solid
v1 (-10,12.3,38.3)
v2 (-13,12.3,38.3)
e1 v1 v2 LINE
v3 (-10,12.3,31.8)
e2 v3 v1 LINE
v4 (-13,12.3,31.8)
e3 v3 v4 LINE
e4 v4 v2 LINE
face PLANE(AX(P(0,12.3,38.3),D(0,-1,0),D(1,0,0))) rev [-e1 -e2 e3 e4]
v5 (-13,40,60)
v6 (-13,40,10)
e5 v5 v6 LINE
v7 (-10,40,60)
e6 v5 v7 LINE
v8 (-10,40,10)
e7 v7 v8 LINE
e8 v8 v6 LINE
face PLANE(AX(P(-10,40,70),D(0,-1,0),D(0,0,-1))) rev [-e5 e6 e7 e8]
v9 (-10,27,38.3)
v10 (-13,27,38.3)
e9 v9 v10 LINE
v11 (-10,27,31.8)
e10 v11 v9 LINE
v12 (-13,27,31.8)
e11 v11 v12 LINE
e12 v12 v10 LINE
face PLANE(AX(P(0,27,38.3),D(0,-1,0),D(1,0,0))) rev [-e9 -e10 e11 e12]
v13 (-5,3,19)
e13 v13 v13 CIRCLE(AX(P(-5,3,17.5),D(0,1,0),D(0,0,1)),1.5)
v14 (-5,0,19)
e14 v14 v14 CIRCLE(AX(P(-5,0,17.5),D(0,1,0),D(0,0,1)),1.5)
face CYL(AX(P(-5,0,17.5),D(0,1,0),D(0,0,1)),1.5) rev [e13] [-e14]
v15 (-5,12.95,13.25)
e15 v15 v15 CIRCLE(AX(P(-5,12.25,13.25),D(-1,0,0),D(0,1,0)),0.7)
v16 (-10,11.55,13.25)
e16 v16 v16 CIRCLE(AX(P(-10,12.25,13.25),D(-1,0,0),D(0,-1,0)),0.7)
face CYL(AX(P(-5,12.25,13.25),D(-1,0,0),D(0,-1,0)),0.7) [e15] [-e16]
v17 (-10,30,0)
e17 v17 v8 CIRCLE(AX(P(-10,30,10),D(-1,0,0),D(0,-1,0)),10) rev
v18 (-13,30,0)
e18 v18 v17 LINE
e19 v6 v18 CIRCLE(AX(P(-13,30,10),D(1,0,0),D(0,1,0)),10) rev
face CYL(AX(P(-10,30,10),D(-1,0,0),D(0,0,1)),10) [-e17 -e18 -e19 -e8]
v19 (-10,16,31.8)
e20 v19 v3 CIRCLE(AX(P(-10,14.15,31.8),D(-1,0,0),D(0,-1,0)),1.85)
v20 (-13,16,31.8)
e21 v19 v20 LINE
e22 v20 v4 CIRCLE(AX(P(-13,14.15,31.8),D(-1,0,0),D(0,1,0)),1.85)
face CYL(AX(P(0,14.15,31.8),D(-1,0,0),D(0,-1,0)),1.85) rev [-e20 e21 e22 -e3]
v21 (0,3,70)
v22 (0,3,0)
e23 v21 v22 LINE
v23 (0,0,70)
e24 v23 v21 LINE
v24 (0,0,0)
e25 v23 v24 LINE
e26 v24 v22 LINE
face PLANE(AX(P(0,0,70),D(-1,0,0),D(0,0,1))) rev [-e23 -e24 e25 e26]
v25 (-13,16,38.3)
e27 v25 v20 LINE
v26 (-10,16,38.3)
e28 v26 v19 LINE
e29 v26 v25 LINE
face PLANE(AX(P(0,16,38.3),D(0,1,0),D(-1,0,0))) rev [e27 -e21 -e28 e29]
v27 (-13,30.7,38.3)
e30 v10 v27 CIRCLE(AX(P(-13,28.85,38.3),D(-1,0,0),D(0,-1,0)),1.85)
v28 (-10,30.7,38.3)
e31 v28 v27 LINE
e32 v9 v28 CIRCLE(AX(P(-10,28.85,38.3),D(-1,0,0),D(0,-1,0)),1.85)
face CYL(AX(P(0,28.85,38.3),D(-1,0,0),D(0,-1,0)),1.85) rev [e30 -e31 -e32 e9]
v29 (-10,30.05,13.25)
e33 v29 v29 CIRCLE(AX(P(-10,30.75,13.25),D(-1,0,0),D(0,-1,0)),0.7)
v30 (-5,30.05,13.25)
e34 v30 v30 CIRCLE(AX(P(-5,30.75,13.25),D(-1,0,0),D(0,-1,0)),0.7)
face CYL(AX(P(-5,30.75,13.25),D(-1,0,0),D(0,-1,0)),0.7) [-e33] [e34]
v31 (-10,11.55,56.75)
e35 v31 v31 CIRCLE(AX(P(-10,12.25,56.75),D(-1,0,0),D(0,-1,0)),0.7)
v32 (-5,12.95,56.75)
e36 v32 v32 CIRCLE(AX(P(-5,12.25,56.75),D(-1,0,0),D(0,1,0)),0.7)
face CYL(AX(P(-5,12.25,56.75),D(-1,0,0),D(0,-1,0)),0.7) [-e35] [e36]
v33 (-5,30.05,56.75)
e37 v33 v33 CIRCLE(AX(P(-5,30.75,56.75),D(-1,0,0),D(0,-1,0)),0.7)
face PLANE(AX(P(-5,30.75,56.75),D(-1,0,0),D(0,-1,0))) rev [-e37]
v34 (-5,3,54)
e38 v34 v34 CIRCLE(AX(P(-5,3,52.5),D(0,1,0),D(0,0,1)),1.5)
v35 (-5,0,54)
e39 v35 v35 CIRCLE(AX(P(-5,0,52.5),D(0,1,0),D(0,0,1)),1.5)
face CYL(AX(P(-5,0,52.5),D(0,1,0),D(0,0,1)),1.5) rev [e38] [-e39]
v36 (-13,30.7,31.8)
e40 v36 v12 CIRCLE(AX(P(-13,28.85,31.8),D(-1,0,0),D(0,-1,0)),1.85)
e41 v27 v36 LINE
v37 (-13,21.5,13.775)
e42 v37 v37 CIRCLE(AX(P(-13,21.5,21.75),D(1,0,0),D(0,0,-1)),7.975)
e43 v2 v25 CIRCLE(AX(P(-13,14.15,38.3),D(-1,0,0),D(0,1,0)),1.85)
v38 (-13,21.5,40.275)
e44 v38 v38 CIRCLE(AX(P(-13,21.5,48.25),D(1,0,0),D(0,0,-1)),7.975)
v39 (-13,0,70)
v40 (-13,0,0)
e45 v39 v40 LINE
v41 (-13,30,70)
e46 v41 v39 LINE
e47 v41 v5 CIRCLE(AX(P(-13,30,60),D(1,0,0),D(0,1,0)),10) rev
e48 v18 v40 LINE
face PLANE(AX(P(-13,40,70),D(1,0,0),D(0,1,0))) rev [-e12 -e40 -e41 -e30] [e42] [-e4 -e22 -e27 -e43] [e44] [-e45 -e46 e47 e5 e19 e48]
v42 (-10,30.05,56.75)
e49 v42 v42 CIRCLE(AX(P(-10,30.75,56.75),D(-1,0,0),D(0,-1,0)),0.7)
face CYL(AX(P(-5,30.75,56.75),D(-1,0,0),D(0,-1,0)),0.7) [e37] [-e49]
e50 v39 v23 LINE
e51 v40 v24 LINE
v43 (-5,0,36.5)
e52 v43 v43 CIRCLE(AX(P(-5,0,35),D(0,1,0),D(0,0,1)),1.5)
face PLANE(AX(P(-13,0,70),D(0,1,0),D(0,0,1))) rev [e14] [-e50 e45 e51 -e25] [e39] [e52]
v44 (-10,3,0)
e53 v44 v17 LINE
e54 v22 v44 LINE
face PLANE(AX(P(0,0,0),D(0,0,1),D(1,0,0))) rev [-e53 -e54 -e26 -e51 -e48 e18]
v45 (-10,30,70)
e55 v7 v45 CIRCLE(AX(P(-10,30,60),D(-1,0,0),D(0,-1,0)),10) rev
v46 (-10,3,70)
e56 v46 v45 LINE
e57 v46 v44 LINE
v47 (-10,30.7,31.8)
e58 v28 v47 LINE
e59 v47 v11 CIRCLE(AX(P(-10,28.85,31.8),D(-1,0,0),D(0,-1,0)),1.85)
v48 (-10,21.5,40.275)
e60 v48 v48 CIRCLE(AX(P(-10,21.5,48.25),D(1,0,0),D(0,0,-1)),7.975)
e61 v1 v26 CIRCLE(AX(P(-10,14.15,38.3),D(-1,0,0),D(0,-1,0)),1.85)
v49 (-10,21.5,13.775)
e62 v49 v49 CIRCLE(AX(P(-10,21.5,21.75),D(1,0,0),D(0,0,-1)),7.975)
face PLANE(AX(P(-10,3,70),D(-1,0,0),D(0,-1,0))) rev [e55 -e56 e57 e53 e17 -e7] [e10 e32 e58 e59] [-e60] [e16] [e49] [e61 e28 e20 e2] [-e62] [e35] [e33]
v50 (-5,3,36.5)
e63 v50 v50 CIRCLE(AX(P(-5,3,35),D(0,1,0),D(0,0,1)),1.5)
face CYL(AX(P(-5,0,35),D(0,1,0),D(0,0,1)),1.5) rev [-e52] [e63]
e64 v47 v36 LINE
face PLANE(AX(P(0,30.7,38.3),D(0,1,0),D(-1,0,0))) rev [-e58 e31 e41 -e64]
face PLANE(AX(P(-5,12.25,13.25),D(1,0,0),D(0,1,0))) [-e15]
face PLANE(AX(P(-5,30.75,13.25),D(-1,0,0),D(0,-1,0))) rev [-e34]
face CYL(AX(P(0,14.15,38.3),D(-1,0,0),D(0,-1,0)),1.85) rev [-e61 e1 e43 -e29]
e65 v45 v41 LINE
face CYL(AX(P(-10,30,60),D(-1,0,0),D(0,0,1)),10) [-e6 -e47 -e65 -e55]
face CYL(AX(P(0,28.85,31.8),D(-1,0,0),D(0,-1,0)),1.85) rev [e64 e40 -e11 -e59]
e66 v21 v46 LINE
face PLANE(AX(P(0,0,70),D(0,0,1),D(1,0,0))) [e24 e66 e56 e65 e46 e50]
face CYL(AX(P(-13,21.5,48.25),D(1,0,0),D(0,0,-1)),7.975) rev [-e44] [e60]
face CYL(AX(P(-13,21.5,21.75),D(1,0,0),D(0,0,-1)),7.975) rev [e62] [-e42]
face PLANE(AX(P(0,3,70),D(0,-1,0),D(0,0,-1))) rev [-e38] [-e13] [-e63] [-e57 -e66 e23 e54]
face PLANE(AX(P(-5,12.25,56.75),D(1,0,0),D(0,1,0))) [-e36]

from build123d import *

# Parameters (mm, degrees)
BOSS_EXTRUDE1_DEPTH = 70
SKETCH2_R           = 7.975
CUT_EXTRUDE9_DEPTH  = 82.240384046
SKETCH2_12_R        = 7.975
CUT_EXTRUDE10_DEPTH = 82.240384046
FILLET1_R           = 10
FILLET2_R           = 10
SKETCH3_R           = 1.5
CUT_EXTRUDE11_DEPTH = 81.237148504
CUT_EXTRUDE12_DEPTH = 82.663945533
SKETCH6_R           = 0.7
BOSS_EXTRUDE2_DEPTH = 8


# Read off the part's stored shape, not the designer's step: Boss-Extrude1
with BuildPart() as part:
    # Boss-Extrude1 outline → Boss-Extrude1 (new body)
    with BuildSketch(Plane.XY):
        Polygon((-10, 40), (-13, 40), (-13, 0), (0, 0), (0, 3), (-10, 3), align=None)
    extrude(amount=BOSS_EXTRUDE1_DEPTH)

    # Sketch2 → Cut-Extrude9 (cut, through all)
    with BuildSketch(Plane(origin=(-10, 0, 0), x_dir=(0, 0, -1), z_dir=(1, 0, 0))):
        with Locations((-48.25, 21.5)):
            Circle(SKETCH2_R)
    extrude(amount=-CUT_EXTRUDE9_DEPTH, mode=Mode.SUBTRACT)

    # Sketch2<12> → Cut-Extrude10 (cut, through all)
    with BuildSketch(Plane(origin=(-10, 0, 0), x_dir=(0, 0, -1), z_dir=(1, 0, 0))):
        with Locations((-21.75, 21.5)):
            Circle(SKETCH2_12_R)
    extrude(amount=-CUT_EXTRUDE10_DEPTH, mode=Mode.SUBTRACT)

    # Fillet1
    fillet1_edges = [part.edges().sort_by_distance(p)[0] for p in [
        (-11.5, 40, 70),
    ]]
    fillet(fillet1_edges, radius=FILLET1_R)

    # Fillet2
    fillet2_edges = [part.edges().sort_by_distance(p)[0] for p in [
        (-11.5, 40, 0),
    ]]
    fillet(fillet2_edges, radius=FILLET2_R)

    # Sketch3 → Cut-Extrude11 (cut, through all)
    with BuildSketch(Plane(origin=(0, 3, 0), x_dir=(1, 0, 0), z_dir=(0, 1, 0))):
        with Locations(Location((-5, -35, 0), (0, 0, 270))):
            Circle(SKETCH3_R)
        with Locations(Location((-5, -52.5, 0), (0, 0, 270))):
            Circle(SKETCH3_R)
        with Locations(Location((-5, -17.5, 0), (0, 0, 270))):
            Circle(SKETCH3_R)
    extrude(amount=-CUT_EXTRUDE11_DEPTH, mode=Mode.SUBTRACT)

    # Sketch4 → Cut-Extrude12 (cut, through all)
    with BuildSketch(Plane.ZY.offset(13)):
        with BuildLine():
            Line((38.3, 27), (31.8, 27))
            ThreePointArc((31.8, 27), (29.95, 28.85), (31.8, 30.7))
            Line((31.8, 30.7), (38.3, 30.7))
            ThreePointArc((38.3, 30.7), (40.15, 28.85), (38.3, 27))
        make_face()
        with BuildLine():
            Line((38.3, 16), (31.8, 16))
            ThreePointArc((31.8, 16), (29.95, 14.15), (31.8, 12.3))
            Line((31.8, 12.3), (38.3, 12.3))
            ThreePointArc((38.3, 12.3), (40.15, 14.15), (38.3, 16))
        make_face()
    extrude(amount=-CUT_EXTRUDE12_DEPTH, mode=Mode.SUBTRACT)

    # Sketch6 → Boss-Extrude2 (add)
    with BuildSketch(Plane.ZY.offset(13)):
        with Locations(Location((56.75, 30.75, 0), (0, 0, 270))):
            Circle(SKETCH6_R)
        with Locations(Location((56.75, 12.25, 0), (0, 0, 270))):
            Circle(SKETCH6_R)
        with Locations(Location((13.25, 30.75, 0), (0, 0, 270))):
            Circle(SKETCH6_R)
        with Locations(Location((13.25, 12.25, 0), (0, 0, 270))):
            Circle(SKETCH6_R)
    extrude(amount=-BOSS_EXTRUDE2_DEPTH)


solid = part.part
